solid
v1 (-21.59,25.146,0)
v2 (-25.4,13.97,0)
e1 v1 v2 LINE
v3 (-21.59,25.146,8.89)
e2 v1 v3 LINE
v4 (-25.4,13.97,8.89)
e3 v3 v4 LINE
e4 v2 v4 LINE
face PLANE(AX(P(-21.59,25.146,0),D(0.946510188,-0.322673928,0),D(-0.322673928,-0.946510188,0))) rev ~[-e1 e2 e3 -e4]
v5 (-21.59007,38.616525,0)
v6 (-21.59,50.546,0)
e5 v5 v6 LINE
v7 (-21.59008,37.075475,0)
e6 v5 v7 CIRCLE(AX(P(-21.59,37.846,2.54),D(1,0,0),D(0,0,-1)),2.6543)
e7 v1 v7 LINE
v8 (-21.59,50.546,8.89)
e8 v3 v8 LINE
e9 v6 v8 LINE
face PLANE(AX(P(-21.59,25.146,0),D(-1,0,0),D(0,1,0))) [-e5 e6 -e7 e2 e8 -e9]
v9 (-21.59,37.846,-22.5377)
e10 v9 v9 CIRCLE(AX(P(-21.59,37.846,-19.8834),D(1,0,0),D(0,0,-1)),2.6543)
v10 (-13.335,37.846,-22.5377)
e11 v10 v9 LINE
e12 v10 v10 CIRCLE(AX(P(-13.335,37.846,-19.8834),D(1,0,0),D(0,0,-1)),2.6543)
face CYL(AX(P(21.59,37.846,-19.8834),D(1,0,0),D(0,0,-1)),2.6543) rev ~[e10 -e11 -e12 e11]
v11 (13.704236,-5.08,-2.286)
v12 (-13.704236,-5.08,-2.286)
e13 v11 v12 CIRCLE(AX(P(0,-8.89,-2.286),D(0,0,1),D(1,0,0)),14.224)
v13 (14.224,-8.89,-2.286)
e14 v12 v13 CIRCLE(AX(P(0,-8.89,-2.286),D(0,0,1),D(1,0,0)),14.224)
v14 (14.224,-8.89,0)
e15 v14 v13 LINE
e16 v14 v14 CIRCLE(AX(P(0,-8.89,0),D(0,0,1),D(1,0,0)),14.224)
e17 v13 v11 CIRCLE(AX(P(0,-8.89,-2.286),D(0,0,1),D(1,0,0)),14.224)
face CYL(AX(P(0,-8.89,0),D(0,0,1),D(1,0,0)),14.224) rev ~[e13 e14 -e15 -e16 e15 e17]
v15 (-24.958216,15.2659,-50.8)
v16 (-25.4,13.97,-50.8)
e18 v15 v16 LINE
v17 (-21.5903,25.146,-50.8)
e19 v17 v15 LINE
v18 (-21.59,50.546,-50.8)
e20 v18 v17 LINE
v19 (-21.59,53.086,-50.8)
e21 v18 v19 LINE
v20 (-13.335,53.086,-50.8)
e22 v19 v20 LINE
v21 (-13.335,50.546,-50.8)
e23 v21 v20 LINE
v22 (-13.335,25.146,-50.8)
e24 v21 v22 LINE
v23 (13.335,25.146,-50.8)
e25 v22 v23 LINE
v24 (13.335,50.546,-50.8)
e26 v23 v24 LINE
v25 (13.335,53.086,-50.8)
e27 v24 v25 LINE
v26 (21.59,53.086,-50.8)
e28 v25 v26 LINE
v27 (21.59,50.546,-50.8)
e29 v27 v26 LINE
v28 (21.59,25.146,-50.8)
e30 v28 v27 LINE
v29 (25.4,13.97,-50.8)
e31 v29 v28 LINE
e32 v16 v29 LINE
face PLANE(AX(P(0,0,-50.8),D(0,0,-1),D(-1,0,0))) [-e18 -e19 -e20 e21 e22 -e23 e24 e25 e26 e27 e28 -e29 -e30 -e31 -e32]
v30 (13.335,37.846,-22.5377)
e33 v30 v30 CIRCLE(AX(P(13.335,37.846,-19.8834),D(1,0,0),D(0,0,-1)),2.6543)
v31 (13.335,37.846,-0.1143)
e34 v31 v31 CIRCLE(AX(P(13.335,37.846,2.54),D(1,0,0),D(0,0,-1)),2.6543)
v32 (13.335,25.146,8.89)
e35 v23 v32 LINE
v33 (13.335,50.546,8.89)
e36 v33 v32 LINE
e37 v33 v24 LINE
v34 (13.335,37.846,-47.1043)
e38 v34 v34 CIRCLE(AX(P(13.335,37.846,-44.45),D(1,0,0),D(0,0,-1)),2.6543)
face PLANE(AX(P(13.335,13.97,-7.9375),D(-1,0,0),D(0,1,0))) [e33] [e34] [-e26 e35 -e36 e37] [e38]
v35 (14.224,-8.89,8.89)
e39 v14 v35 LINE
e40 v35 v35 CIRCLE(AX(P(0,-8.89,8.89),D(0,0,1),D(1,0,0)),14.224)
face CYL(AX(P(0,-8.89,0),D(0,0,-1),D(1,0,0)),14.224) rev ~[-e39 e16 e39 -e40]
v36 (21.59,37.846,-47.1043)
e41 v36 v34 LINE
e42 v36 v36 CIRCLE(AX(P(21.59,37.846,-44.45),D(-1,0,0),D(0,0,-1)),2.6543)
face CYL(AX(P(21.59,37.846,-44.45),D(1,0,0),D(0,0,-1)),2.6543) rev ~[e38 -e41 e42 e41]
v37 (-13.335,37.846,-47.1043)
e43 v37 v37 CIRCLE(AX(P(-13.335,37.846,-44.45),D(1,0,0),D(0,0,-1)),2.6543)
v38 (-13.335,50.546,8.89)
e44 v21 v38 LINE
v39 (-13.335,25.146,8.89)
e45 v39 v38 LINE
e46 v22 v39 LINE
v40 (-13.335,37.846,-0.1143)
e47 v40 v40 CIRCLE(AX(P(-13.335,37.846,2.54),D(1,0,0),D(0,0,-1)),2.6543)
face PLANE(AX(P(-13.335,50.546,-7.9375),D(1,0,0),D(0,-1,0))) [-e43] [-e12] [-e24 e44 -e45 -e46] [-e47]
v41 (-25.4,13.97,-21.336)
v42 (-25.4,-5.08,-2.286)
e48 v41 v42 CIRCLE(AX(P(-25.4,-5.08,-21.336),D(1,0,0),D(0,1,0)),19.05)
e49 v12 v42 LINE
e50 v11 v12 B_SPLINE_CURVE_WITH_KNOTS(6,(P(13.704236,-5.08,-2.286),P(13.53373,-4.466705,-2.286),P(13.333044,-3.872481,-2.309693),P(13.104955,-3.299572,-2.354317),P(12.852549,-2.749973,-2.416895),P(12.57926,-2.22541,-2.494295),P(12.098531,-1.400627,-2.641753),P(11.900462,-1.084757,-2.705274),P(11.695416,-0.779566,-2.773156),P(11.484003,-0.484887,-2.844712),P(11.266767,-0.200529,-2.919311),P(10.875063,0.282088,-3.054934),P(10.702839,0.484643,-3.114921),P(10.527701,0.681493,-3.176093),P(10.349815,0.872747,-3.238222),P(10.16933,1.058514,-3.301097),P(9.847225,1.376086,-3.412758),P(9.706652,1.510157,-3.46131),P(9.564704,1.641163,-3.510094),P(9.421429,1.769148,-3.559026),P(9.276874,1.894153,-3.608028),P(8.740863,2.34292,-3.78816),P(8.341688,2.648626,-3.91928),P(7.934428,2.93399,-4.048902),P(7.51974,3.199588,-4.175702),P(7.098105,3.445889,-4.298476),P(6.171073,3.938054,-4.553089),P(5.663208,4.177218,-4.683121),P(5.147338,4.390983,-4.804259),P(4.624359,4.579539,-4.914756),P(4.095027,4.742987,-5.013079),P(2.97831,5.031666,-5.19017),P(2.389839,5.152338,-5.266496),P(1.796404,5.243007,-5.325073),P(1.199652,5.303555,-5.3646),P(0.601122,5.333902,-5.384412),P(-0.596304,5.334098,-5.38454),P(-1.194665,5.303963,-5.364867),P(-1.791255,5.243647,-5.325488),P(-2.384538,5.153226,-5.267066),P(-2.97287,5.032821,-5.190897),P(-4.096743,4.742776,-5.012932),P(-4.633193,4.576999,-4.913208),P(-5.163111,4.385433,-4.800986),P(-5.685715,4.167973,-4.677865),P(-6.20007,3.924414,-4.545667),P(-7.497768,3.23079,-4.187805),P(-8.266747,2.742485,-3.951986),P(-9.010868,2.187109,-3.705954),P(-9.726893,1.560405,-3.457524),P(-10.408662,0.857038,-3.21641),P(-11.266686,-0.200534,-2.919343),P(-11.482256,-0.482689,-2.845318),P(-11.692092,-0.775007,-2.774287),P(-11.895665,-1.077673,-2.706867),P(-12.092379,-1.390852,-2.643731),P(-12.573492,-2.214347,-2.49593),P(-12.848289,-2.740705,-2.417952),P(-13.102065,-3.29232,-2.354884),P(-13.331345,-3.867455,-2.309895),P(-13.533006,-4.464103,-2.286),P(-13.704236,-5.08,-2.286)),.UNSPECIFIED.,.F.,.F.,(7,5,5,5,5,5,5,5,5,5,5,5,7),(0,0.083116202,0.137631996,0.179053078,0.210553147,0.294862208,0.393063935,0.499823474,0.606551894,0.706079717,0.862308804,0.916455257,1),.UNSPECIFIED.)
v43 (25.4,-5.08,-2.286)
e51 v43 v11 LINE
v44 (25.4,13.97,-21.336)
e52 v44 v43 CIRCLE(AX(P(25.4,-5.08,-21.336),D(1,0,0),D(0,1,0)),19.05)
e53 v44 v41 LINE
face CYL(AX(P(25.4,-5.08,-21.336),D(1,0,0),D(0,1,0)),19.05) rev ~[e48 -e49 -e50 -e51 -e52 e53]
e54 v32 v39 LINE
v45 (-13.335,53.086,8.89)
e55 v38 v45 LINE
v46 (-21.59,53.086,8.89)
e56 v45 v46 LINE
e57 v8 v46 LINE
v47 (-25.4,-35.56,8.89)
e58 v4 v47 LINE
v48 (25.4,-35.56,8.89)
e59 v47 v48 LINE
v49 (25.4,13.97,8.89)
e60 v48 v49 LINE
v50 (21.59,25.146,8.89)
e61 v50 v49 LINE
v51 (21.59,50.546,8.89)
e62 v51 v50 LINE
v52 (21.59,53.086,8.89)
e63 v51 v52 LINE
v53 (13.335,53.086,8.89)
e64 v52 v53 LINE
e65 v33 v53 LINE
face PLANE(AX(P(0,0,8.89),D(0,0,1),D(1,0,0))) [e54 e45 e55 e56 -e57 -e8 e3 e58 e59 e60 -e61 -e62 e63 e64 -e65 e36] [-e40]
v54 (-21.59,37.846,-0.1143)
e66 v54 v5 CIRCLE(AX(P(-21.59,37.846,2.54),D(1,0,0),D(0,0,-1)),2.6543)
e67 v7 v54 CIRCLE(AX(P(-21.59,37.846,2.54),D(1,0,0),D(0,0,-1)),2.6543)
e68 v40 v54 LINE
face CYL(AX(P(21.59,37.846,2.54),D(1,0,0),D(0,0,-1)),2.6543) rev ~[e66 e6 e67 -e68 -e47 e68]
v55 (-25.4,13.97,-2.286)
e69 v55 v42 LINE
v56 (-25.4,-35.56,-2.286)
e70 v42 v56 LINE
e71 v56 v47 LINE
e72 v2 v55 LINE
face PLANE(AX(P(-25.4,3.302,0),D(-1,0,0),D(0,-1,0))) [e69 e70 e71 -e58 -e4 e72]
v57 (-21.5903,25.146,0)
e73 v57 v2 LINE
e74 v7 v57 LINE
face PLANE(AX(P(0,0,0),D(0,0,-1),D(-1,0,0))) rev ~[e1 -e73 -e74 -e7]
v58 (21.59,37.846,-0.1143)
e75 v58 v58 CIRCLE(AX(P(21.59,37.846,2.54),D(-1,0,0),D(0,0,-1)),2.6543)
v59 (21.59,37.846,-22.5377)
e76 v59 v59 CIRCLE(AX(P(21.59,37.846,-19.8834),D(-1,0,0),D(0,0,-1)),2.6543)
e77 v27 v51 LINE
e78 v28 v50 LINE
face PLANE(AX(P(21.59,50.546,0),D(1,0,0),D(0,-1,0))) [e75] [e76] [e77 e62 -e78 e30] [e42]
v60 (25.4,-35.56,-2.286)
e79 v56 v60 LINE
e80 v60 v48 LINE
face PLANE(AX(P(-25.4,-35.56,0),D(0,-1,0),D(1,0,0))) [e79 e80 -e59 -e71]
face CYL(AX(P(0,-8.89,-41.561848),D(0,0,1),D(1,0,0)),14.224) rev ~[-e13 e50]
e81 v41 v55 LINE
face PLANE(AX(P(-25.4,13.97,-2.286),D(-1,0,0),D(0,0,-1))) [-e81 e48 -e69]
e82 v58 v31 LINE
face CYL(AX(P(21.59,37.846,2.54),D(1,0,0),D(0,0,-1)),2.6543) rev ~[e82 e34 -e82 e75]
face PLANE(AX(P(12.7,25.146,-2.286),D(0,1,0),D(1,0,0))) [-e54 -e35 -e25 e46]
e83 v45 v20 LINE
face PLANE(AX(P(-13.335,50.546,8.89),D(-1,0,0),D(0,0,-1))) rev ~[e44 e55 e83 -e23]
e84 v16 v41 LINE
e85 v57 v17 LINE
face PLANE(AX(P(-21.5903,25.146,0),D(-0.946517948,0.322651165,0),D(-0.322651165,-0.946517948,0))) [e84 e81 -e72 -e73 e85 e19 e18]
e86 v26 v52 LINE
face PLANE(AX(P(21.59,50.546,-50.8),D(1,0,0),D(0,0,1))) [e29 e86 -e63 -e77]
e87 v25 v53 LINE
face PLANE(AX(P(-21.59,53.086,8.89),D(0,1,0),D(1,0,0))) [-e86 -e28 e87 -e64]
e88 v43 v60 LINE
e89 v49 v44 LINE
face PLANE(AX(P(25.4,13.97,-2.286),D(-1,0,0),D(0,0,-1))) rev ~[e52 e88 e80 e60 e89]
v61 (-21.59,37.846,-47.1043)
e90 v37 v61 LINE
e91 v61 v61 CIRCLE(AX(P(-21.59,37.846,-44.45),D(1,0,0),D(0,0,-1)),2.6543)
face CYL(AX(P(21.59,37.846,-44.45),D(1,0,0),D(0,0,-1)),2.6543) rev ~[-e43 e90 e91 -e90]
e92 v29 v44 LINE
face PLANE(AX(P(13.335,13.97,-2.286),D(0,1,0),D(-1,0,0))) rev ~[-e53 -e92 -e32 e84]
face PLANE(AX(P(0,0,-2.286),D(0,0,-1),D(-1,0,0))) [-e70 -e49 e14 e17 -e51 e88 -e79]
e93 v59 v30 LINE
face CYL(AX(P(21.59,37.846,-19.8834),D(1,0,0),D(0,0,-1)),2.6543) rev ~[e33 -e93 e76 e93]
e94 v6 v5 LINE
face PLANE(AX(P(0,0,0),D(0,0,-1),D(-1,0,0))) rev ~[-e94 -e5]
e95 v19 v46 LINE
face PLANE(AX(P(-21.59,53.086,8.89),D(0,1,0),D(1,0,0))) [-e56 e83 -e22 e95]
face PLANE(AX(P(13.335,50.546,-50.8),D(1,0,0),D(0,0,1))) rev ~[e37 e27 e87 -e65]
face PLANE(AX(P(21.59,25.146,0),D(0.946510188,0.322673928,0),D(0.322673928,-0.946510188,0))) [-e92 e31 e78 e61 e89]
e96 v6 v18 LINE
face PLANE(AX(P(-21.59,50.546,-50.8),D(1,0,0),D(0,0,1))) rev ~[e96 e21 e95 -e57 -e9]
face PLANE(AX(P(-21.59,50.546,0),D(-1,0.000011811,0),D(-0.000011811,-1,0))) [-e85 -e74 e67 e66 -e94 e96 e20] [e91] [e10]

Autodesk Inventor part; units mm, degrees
ref_plane "YZ Plane" through (0, 0, 0) normal (1, 0, 0) x (0, 1, 0)
ref_plane "XZ Plane" through (0, 0, 0) normal (0, 1, 0) x (-1, 0, 0)
ref_plane "XY Plane" through (0, 0, 0) normal (0, 0, 1) x (1, 0, 0)
sketch "Sketch1" plane through (0, 0, 0) normal (0, 0, 1) x (1, 0, 0)
  line L0 (-25.4, -35.56) -> (25.4, -35.56)
  line L1 (25.4, -35.56) -> (25.4, 13.97)
  line L2 (25.4, 13.97) -> (-25.4, 13.97)
  line L3 (-25.4, 13.97) -> (-25.4, -35.56)
  line L4 (-25.4, -35.56) -> (25.4, 13.97) construction
  line L5 (25.4, -35.56) -> (-25.4, 13.97) construction
  line L6 (0, 25.146) -> (-12.7, 25.146)
  line L7 (-12.7, 25.146) -> (12.7, 25.146)
  line L8 (-12.7, 25.146) -> (-25.4, 13.97)
  line L9 (12.7, 25.146) -> (25.4, 13.97)
  line L10 (-12.7, 25.146) -> (-21.59, 25.146)
  line L11 (-21.59, 25.146) -> (-21.59, 50.546)
  line L12 (-21.59, 50.546) -> (-12.7, 50.546)
  line L13 (-12.7, 50.546) -> (-12.7, 25.146)
  line L14 (-21.59, 25.146) -> (-25.4, 13.97)
  line L15 (12.7, 25.146) -> (12.7, 50.546)
  line L16 (12.7, 50.546) -> (21.59, 50.546)
  line L17 (21.59, 50.546) -> (21.59, 25.146)
  line L18 (21.59, 25.146) -> (25.4, 13.97)
  line L19 (12.7, 25.146) -> (21.59, 25.146)
  circle A0 centre (0, -8.89) radius 14.224
  point P0 (0, 0)
  dimension "d1" = 49.53
  dimension "d2" = 50.8
  dimension "d6" = 8.89
  dimension "d7" = 25.4
  dimension "d8" = 8.89
  dimension "d47" = 11.176
  dimension "d51" = 28.448
  dimension "d52" = 34.036
  dimension "d53" = 43.18
extrude "Extrusion1" add sketch "Sketch1" along normal blind 8.89
sketch "Sketch3" plane through (0, 0, 0) normal (0, 0, -1) x (-1, 0, 0)
  circle A0 centre (0, 0) radius 14.224
  line L0 (21.5903, 3.302) -> (-21.59, 3.302)
  line L1 (-21.59, 3.302) -> (-21.59, 25.146)
  line L2 (-21.59, 25.146) -> (21.5903, 25.146)
  line L3 (21.5903, 25.146) -> (21.5903, 3.302)
  circle A1 centre (0, 0) radius 14.224 projected
  line L4 (21.5903, 3.302) -> (-21.59, 25.146) construction
  line L5 (-21.59, 3.302) -> (21.5903, 25.146) construction
  line L6 (-25.4, -35.56) -> (-25.4, 13.97) projected
  line L7 (25.4, 13.97) -> (25.4, -35.56) projected
  line L8 (25.4, -35.56) -> (-25.4, -35.56) projected
  line L9 (25.4, 13.97) -> (25.4, -35.56) projected
  line L10 (21.59, 25.146) -> (25.4, 13.97) projected
  line L11 (21.59, 50.546) -> (21.59, 25.146) projected
  line L12 (12.7, 50.546) -> (21.59, 50.546) projected
  line L13 (12.7, 25.146) -> (12.7, 50.546) projected
  line L14 (-12.7, 25.146) -> (12.7, 25.146) projected
  line L15 (-12.7, 50.546) -> (-12.7, 25.146) projected
  line L16 (-21.59, 50.546) -> (-12.7, 50.546) projected
  line L17 (-21.59, 25.146) -> (-21.59, 50.546) projected
  line L18 (-25.4, 13.97) -> (-21.59, 25.146) projected
  line L19 (-25.4, -35.56) -> (-25.4, 13.97) projected
  line L20 (25.4, 3.302) -> (21.5903, 3.302)
  line L21 (-25.4, 3.302) -> (-21.59, 3.302)
  line L22 (0, 14.224) -> (-25.4, 14.224)
  point P0 (0.0002, 14.224)
  point P1 (-25.4, 13.97)
  point P2 (-13.8354, 3.302)
  point P3 (13.8354, 3.302)
  dimension "d13" = 28.448
extrude "Extrusion3" add sketch "Sketch3" along normal blind 50.8 contours A0 L22 L1 L2 L3 L0 | L0 L1 L22 A0 | L3 L10 L7 L20 | L21 L6 L18 L22 L1 | L22 L18 L1 | L2 L13 L12 L11 | L17 L16 L15 L2
sketch "Sketch5" plane through (21.59, 50.546, 8.89) normal (1, 0, 0) x (0, 0, -1)
  line L0 (59.69, -25.4) -> (59.69, 0) projected
  line L1 (0, -23.5788) -> (57.5469, -23.5788) projected
  line L2 (57.5469, 0) -> (57.5469, -23.5788)
  line L3 (59.69, 0) -> (59.69, -25.4) projected
  line L4 (59.69, 0) -> (0, 0) projected
  line L5 (0, -25.4) -> (0, 0) projected
  line L6 (59.69, -25.4) -> (0, -25.4) projected
  line L7 (0, -25.4) -> (0, -12.7)
  line L8 (0, -12.7) -> (57.5469, -12.7)
  circle A0 centre (6.35, -12.7) radius 2.6543
  circle A1 centre (53.34, -12.7) radius 2.6543
  circle A2 centre (28.7734, -12.7) radius 2.6543
  point P0 (8.89, -50.546)
  point P1 (59.69, -25.4)
  point P2 (31.4277, -12.7)
  point P3 (26.1191, -12.7)
  point P4 (55.9943, -12.7)
  point P5 (50.6857, -12.7)
  point P6 (9.0043, -12.7)
  point P7 (3.6957, -12.7)
  dimension "d39" = 12.7
  dimension "d40" = 5.3086
  dimension "d41" = 6.35
  dimension "d42" = 5.3086
  dimension "d43" = 6.35
  dimension "d44" = 5.3086
  dimension "d46" = 0
extrude "Extrusion4" cut sketch "Sketch5" against normal up to surface (43.18 mm away) contours A1 L8 | L8 A1 | A0 L8 | L8 A0 | A2 L8 | L8 A2
sketch "Sketch9" plane through (0, 0, -50.8) normal (0, 0, -1) x (-1, 0, 0)
  line L0 (-21.59, 50.546) -> (-12.7, 50.546) projected
  line L1 (13.335, -0.254) -> (-13.335, -0.254)
  line L2 (-13.335, -0.254) -> (-13.335, 50.546)
  line L3 (-13.335, 50.546) -> (13.335, 50.546)
  line L4 (13.335, 50.546) -> (13.335, -0.254)
  line L5 (-12.7, 25.146) -> (12.7, 25.146) projected
  line L6 (13.335, -0.254) -> (-13.335, 50.546) construction
  line L7 (-13.335, -0.254) -> (13.335, 50.546) construction
  line L8 (-25.4, -35.56) -> (-25.4, 13.97) projected
  line L9 (25.4, -13.97) -> (-25.4, -13.97)
  line L10 (-25.4, -13.97) -> (-25.4, 13.97)
  line L11 (-25.4, 13.97) -> (25.4, 13.97)
  line L12 (25.4, 13.97) -> (25.4, -13.97)
  line L13 (25.4, -13.97) -> (-25.4, 13.97) construction
  line L14 (-25.4, -13.97) -> (25.4, 13.97) construction
  point P0 (0, 0)
  point P1 (0, 25.146)
  point P2 (-13.335, 13.97)
  point P3 (13.335, 13.97)
  point P4 (-12.7, 50.546)
  dimension "d27" = 26.67
extrude "Extrusion5" cut sketch "Sketch9" against normal blind 42.8625
sketch "Sketch11" plane through (0, 0, 0) normal (0, 0, -1) x (-1, 0, 0)
  line L0 (25.4, 3.302) -> (13.8354, 3.302) projected
  line L1 (-13.8354, 3.302) -> (-25.4, 3.302) projected
  line L2 (-25.4, -35.56) -> (-25.4, 3.302) projected
  line L3 (25.4, -35.56) -> (-25.4, -35.56) projected
  line L4 (25.4, 3.302) -> (25.4, -35.56) projected
  line L5 (12.7, 25.146) -> (12.7, 50.546) projected
  line L6 (-12.7, 25.146) -> (12.7, 25.146) projected
  line L7 (-12.7, 50.546) -> (-12.7, 25.146) projected
  line L8 (-13.335, 50.546) -> (-12.7, 50.546) projected
  line L9 (-13.335, 13.97) -> (-13.335, 50.546) projected
  line L10 (-25.4, 13.97) -> (-13.335, 13.97) projected
  line L11 (-25.4, 3.302) -> (-25.4, 13.97) projected
  line L12 (-13.8354, 3.302) -> (-25.4, 3.302) projected
  arc A0 (13.8354, 3.302) -> (-13.8354, 3.302) centre (0, 0) ccw projected
  line L13 (25.4, 3.302) -> (13.8354, 3.302) projected
  line L14 (25.4, 13.97) -> (25.4, 3.302) projected
  line L15 (13.335, 13.97) -> (25.4, 13.97) projected
  line L16 (13.335, 50.546) -> (13.335, 13.97) projected
  line L17 (12.7, 50.546) -> (13.335, 50.546) projected
  arc A1 (13.8354, 3.302) -> (-13.8354, 3.302) centre (0, 0) ccw projected
extrude "Extrusion6" add sketch "Sketch11" along normal blind 2.286 contours L4 L3 L2 L1 A0 L0
sketch "Sketch12" plane through (0, 0, -7.9375) normal (0, 0, -1) x (-1, 0, 0)
  line L0 (12.7, 25.146) -> (12.7, 50.546) projected
  line L1 (-12.7, 25.146) -> (12.7, 25.146) projected
  line L2 (-12.7, 50.546) -> (-12.7, 25.146) projected
  line L3 (-13.335, 50.546) -> (-12.7, 50.546) projected
  line L4 (-13.335, 13.97) -> (-13.335, 50.546) projected
  line L5 (-25.4, 13.97) -> (-13.335, 13.97) projected
  line L6 (-25.4, 3.302) -> (-25.4, 13.97) projected
  line L7 (-13.8354, 3.302) -> (-25.4, 3.302) projected
  arc A0 (13.8354, 3.302) -> (-13.8354, 3.302) centre (0, 0) ccw projected
  line L8 (25.4, 3.302) -> (13.8354, 3.302) projected
  line L9 (25.4, 13.97) -> (25.4, 3.302) projected
  line L10 (13.335, 13.97) -> (25.4, 13.97) projected
  line L11 (13.335, 50.546) -> (13.335, 13.97) projected
  line L12 (12.7, 50.546) -> (13.335, 50.546) projected
extrude "Extrusion7" cut sketch "Sketch12" against normal blind 5.6515
sketch "Sketch13" plane through (0, 0, -2.286) normal (0, 0, -1) x (-1, 0, 0)
  line L0 (-12.7, 25.146) -> (12.7, 25.146) projected
  line L1 (-13.335, 13.97) -> (-13.335, 50.546) projected
  line L2 (12.7, 25.146) -> (-13.335, 25.146)
  line L3 (-13.335, 25.146) -> (-13.335, 50.546)
  line L4 (-13.335, 50.546) -> (12.7, 50.546)
  line L5 (12.7, 50.546) -> (12.7, 25.146)
  line L6 (13.335, 50.546) -> (13.335, 13.97) projected
  line L7 (12.7, 50.546) -> (13.335, 50.546)
  line L8 (13.335, 50.546) -> (13.335, 25.146)
  line L9 (13.335, 25.146) -> (12.7, 25.146)
  line L10 (12.7, 25.146) -> (12.7, 50.546)
  point P0 (0, 0)
  point P1 (-13.335, 25.146)
extrude "Extrusion8" cut sketch "Sketch13" against normal blind 37.211
sketch "Sketch14" plane through (0, 0, -2.286) normal (0, 0, -1) x (-1, 0, 0)
  circle A0 centre (0, 0) radius 14.224 projected
  line L0 (25.4, 13.97) -> (25.4, -35.56) projected
  line L1 (13.335, 25.146) -> (-13.335, 25.146) projected
  line L2 (-13.335, 13.97) -> (-13.335, 25.146) projected
  line L3 (-25.4, 13.97) -> (-13.335, 13.97) projected
  line L4 (-25.4, -35.56) -> (-25.4, 13.97) projected
  line L5 (-25.4, -35.56) -> (25.4, -35.56) projected
  line L6 (25.4, 13.97) -> (25.4, -35.56) projected
  line L7 (13.335, 13.97) -> (25.4, 13.97) projected
  line L8 (13.335, 25.146) -> (13.335, 13.97) projected
  line L9 (-13.335, 13.97) -> (-13.335, 50.546) projected
  line L10 (-13.335, 50.546) -> (-21.59, 50.546) projected
  line L11 (-21.59, 50.546) -> (-21.59, 25.146) projected
  line L12 (-21.59, 25.146) -> (-25.4, 13.97) projected
  line L13 (-25.4, 13.97) -> (-13.335, 13.97) projected
  line L14 (13.335, 50.546) -> (13.335, 13.97) projected
  line L15 (13.335, 13.97) -> (25.4, 13.97) projected
  line L16 (25.4, 13.97) -> (21.59, 25.146) projected
  line L17 (21.59, 25.146) -> (21.59, 50.546) projected
  line L18 (21.59, 50.546) -> (13.335, 50.546) projected
  line L19 (-21.59, 25.146) -> (21.59, 25.146)
  line L20 (-25.4, 15.2659) -> (25.4, 15.2659)
  point P0 (25.4, 14.224)
  point P1 (25.4, 13.97)
  point P2 (-25.4, 13.97)
  point P3 (25.4, 13.97)
  point P4 (24.9582, 15.2659)
  point P5 (13.335, 15.2659)
  point P6 (-13.335, 15.2659)
  point P7 (-24.9582, 15.2659)
extrude "Extrusion9" add sketch "Sketch14" along normal up to surface (48.514 mm away) contours L20 L8 L19 L16 | L20 L2 L1 L8 | L20 L12 L19 L2
sketch "Sketch15" plane through (0, -8.89, 0) normal (0, 0, 1) x (1, 0, 0)
  circle A0 centre (0, 0) radius 14.224 projected
  point P0 (0, 8.89)
extrude "Extrusion10" cut sketch "Sketch15" against normal blind 33.9725
sketch "Sketch16" plane through (-21.59, 50.546, 8.89) normal (0, 1, 0) x (1, 0, 0)
  line L0 (8.255, 0) -> (8.255, 59.69) projected
  line L1 (0, 59.69) -> (8.255, 59.69) projected
  line L2 (0, 59.69) -> (0, 0) projected
  line L3 (8.255, 0) -> (0, 0) projected
  line L4 (34.925, 59.69) -> (34.925, 0) projected
  line L5 (43.18, 0) -> (34.925, 0) projected
  line L6 (43.18, 59.69) -> (43.18, 0) projected
  line L7 (34.925, 59.69) -> (43.18, 59.69) projected
  point P0 (21.59, 8.89)
extrude "Extrusion11" add sketch "Sketch16" along normal blind 2.54
sketch "Sketch17" plane through (0, 0, -2.286) normal (0, 0, -1) x (-1, 0, 0)
  line L0 (-25.4, 13.97) -> (-13.335, 13.97) projected
  line L1 (13.335, 15.2659) -> (13.335, 13.97) projected
  line L2 (-13.335, 13.97) -> (13.335, 13.97)
  line L3 (13.335, 13.97) -> (13.335, 15.2659)
  line L4 (13.335, 15.2659) -> (-13.335, 15.2659)
  line L5 (-13.335, 15.2659) -> (-13.335, 13.97)
  point P0 (0, 0)
extrude "Extrusion12" add sketch "Sketch17" along normal up to surface (48.514 mm away)
fillet "Fillet5" radius 19.05 1 edges at (0, 13.97, -2.286)
equation "\"d9\" = d6"
properties part number "CH-4_DiffBarSupport"
